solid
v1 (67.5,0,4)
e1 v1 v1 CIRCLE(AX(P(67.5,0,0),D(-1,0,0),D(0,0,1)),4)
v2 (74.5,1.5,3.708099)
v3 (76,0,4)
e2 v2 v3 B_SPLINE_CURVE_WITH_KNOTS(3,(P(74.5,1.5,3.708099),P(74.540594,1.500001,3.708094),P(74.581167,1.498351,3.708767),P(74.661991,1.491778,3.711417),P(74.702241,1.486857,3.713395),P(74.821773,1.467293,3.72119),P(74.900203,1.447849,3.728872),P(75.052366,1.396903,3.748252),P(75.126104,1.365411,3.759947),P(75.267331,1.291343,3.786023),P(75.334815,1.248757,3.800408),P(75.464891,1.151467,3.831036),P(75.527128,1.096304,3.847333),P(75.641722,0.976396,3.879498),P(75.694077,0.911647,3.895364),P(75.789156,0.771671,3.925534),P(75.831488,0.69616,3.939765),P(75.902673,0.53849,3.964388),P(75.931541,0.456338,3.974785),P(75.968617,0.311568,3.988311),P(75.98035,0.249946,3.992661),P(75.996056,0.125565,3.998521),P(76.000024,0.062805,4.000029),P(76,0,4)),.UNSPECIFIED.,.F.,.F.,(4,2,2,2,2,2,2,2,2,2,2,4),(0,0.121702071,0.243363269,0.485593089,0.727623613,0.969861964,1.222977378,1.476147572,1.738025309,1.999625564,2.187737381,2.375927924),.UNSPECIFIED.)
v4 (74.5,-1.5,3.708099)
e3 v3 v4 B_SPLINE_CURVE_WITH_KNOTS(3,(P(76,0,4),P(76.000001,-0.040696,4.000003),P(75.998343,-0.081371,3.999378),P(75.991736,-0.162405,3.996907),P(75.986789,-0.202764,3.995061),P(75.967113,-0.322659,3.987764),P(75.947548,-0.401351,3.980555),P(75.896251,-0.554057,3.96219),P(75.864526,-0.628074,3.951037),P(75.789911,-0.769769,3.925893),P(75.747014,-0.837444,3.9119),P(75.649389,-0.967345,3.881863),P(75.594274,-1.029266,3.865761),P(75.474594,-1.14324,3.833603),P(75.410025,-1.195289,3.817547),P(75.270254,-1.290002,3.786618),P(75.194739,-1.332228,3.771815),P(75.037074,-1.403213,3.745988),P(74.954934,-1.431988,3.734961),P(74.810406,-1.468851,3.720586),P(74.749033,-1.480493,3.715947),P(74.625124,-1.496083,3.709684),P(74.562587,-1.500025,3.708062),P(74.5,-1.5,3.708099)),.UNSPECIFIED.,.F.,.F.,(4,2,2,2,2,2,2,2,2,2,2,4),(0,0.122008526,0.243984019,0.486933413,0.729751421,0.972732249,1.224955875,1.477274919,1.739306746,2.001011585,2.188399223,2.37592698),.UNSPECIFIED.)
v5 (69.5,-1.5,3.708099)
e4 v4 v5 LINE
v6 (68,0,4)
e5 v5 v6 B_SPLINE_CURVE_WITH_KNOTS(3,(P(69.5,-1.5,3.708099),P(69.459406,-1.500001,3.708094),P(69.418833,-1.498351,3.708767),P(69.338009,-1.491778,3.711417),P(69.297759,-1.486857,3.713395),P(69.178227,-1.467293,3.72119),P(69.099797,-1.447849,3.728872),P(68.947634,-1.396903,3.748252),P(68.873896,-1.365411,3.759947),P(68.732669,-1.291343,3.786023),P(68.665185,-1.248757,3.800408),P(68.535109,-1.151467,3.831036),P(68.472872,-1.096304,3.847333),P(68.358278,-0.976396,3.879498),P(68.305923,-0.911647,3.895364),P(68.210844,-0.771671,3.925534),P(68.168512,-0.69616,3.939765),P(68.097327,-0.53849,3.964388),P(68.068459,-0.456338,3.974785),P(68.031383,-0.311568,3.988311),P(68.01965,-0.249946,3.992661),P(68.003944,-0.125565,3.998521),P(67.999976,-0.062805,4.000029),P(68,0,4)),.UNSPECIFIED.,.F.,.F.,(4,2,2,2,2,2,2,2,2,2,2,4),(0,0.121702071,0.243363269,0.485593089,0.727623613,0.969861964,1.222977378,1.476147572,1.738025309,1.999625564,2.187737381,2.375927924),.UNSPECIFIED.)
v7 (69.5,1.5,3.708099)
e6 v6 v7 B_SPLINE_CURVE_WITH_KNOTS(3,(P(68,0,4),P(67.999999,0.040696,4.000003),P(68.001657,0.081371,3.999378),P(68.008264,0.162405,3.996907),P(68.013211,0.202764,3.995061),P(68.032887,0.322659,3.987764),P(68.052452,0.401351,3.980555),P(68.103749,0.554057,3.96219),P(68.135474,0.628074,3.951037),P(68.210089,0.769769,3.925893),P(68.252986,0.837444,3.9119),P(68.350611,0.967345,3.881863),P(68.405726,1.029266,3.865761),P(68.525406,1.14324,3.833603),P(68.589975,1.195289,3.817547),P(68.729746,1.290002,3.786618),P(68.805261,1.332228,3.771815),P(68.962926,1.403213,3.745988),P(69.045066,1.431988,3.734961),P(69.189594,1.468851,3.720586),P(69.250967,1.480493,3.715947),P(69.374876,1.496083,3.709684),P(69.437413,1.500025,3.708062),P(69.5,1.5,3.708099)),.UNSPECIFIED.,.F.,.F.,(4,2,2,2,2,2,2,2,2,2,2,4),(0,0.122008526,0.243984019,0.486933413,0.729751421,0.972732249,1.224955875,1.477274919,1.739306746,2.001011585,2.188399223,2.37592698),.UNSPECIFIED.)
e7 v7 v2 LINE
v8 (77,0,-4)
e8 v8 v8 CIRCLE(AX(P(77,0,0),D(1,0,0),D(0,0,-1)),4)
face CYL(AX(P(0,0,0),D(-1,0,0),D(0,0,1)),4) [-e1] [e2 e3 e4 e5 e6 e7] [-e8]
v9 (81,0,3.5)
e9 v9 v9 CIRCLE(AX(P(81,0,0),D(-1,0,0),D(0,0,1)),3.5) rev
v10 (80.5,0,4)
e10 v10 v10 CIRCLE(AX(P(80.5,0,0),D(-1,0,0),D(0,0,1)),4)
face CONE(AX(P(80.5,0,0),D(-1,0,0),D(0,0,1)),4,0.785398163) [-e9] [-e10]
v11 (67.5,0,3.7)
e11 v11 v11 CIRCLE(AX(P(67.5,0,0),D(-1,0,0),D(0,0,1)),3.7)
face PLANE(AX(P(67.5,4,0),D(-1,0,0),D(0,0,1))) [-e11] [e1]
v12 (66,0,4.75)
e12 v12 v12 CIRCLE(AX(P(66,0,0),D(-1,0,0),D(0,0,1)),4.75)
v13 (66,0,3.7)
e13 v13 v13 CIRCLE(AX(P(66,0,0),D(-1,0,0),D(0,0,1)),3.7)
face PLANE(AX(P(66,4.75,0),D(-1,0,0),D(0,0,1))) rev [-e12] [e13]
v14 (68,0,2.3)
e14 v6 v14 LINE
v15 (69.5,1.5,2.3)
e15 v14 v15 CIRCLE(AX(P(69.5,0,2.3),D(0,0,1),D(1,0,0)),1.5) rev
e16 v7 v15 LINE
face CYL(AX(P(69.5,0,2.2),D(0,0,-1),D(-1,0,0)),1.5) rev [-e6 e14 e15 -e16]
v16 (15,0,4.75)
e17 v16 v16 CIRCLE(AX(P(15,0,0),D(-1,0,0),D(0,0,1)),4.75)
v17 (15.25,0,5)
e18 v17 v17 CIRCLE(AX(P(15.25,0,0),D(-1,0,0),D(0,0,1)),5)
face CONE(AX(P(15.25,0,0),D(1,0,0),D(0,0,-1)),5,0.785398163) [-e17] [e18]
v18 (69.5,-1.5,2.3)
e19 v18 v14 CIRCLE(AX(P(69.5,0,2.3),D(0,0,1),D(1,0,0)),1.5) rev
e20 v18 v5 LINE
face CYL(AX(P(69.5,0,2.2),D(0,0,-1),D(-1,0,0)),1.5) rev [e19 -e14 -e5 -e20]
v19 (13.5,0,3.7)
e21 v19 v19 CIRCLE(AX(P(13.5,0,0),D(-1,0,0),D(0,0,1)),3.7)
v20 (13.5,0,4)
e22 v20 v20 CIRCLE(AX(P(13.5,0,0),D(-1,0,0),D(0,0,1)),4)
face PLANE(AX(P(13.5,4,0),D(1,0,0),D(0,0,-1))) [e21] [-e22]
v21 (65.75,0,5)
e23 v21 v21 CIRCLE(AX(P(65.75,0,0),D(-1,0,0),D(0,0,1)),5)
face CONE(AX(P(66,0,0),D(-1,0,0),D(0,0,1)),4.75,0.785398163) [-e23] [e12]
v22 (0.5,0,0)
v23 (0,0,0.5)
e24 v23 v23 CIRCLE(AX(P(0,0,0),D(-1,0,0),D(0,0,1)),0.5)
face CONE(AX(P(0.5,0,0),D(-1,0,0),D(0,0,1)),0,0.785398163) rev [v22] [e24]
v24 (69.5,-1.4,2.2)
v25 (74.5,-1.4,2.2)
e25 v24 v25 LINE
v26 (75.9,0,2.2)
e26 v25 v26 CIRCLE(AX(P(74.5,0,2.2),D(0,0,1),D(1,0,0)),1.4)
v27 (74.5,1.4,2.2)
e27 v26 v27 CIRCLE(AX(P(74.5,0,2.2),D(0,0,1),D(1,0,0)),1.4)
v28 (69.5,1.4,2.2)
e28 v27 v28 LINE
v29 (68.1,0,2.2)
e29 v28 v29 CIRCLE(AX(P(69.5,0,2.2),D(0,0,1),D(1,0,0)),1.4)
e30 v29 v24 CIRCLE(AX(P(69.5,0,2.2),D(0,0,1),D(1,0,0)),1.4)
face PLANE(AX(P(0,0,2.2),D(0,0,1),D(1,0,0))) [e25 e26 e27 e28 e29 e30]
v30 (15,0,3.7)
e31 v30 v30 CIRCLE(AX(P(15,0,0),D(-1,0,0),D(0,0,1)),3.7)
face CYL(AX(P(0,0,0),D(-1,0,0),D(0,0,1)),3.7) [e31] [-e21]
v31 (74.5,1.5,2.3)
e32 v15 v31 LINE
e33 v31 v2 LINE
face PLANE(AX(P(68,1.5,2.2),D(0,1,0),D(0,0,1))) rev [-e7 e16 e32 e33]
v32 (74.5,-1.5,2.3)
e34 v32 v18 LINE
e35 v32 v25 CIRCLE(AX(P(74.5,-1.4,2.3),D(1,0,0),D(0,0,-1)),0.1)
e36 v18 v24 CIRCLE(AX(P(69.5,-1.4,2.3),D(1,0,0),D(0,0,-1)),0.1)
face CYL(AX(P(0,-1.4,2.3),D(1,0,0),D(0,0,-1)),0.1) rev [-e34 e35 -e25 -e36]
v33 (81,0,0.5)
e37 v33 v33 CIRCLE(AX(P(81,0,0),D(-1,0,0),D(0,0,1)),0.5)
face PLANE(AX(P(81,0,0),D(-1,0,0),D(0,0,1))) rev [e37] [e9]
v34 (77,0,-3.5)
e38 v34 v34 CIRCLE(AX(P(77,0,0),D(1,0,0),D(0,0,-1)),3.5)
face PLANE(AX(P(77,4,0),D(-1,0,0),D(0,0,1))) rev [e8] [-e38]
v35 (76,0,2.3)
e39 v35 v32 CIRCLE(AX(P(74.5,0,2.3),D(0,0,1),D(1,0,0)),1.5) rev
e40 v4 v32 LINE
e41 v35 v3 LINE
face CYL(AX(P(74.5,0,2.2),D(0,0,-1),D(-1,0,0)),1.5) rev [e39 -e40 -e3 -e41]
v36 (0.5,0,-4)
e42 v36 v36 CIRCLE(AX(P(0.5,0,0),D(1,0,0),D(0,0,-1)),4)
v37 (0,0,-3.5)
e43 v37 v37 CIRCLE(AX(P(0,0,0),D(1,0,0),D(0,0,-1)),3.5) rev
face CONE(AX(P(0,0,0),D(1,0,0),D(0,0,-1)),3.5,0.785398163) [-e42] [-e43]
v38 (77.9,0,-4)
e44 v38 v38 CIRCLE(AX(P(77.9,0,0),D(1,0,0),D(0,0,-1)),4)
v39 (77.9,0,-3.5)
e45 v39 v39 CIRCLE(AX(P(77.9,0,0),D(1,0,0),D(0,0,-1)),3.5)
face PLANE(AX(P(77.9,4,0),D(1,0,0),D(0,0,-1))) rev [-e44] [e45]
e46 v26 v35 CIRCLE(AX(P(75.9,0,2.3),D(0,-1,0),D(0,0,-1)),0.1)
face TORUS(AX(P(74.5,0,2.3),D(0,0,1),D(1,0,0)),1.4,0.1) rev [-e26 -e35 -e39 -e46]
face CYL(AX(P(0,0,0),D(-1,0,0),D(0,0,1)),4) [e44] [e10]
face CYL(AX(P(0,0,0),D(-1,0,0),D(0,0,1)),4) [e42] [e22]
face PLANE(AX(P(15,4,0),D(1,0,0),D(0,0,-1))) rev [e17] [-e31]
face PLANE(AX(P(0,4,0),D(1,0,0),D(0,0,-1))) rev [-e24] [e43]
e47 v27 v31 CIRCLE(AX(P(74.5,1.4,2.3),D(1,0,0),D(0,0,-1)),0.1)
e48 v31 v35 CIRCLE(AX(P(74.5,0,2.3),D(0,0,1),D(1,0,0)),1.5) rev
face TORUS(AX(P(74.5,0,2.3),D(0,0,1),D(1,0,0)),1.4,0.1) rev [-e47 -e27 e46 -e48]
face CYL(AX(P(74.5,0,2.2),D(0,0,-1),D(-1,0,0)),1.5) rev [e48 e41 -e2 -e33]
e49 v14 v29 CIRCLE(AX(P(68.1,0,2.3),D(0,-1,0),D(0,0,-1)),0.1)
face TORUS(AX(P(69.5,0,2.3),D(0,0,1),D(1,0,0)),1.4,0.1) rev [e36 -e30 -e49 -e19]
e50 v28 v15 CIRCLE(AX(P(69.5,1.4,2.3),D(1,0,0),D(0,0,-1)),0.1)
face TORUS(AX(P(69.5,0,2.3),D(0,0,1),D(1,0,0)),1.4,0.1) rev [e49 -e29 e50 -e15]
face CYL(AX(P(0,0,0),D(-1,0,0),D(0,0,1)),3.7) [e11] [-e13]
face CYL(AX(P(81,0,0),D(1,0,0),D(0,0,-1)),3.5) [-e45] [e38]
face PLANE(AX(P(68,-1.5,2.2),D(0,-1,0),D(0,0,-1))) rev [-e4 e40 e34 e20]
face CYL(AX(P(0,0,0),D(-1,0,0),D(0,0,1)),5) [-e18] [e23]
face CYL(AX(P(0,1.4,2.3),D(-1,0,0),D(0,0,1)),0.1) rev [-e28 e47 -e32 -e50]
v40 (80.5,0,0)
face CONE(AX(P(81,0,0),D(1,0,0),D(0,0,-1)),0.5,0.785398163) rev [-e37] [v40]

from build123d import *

# Parameters (mm, degrees)
CHAMFER1_SIZE      = 0.5
SKETCH3_W          = 1.5
SKETCH3_H          = 0.3
SKETCH17_W         = 8
SKETCH17_H         = 3
CUT_EXTRUDE4_DEPTH = 1.8
FILLET10_R         = 1.5
FILLET11_R         = 1.5
FILLET12_R         = 0.1
SKETCH29_W         = 0.9
SKETCH29_H         = 0.5


with BuildPart() as part:
    # Sketch1 → Revolve1 (revolve)
    with BuildSketch(Plane.XY, mode=Mode.PRIVATE) as revolve1_sk:
        Polygon((0, 4), (15, 4), (15, 4.75), (15.25, 5), (65.75, 5), (66, 4.75), (66, 4), (81, 4), (81, 0), (0, 0), align=None)
    revolve(revolve1_sk.sketch.rotate(Axis((0, 0, 0), (1, 0, 0)), 90), axis=Axis((0, 0, 0), (1, 0, 0)))

    # Chamfer1
    chamfer1_edges = [part.edges().sort_by_distance(p)[0] for p in [
        (81, 0, -4),
        (0, 0, -4),
    ]]
    chamfer(chamfer1_edges, length=CHAMFER1_SIZE)

    # Sketch2 → Cut-Revolve1 (revolve, cut)
    with BuildSketch(Plane.XY, mode=Mode.PRIVATE) as cut_revolve1_sk:
        Polygon((0, 0.5), (0.5, 0), (0, 0), align=None)
        Polygon((81, 0), (81, 0.5), (80.5, 0), align=None)
    revolve(cut_revolve1_sk.sketch.rotate(Axis((0, 0, 0), (1, 0, 0)), 270), axis=Axis((0, 0, 0), (1, 0, 0)), mode=Mode.SUBTRACT)

    # Sketch3 → Cut-Revolve2 (revolve, cut)
    with BuildSketch(Plane.XY, mode=Mode.PRIVATE) as cut_revolve2_sk:
        with Locations((14.25, 3.85)):
            Rectangle(SKETCH3_W, SKETCH3_H)
        with Locations((66.75, 3.85)):
            Rectangle(SKETCH3_W, SKETCH3_H)
    revolve(cut_revolve2_sk.sketch.rotate(Axis((0, 0, 0), (1, 0, 0)), 90), axis=Axis((0, 0, 0), (1, 0, 0)), mode=Mode.SUBTRACT)

    # Sketch17 → Cut-Extrude4 (cut)
    with BuildSketch(Plane.XY.offset(4)):
        with Locations((72, 0)):
            Rectangle(SKETCH17_W, SKETCH17_H)
    extrude(amount=-CUT_EXTRUDE4_DEPTH, mode=Mode.SUBTRACT)

    # Fillet10
    fillet10_edges = [part.edges().sort_by_distance(p)[0] for p in [
        (76, 1.5, 2.954049622),
        (76, -1.5, 2.954049622),
    ]]
    fillet(fillet10_edges, radius=FILLET10_R - 0.0001)  # a hair under: the kernel refuses the full size

    # Fillet11
    fillet11_edges = [part.edges().sort_by_distance(p)[0] for p in [
        (68, 1.5, 2.954049622),
        (68, -1.5, 2.954049622),
    ]]
    fillet(fillet11_edges, radius=FILLET11_R - 0.0001)  # a hair under: the kernel refuses the full size

    # Fillet12
    fillet12_edges = [part.edges().sort_by_distance(p)[0] for p in [
        (72, 1.5, 2.2),
        (75.560689461, -1.060689461, 2.2),
        (75.560689461, 1.060689461, 2.2),
        (72, -1.5, 2.2),
        (68.439310539, -1.060689461, 2.2),
        (68.439310539, 1.060689461, 2.2),
    ]]
    fillet(fillet12_edges, radius=FILLET12_R)

    # Sketch29 → Cut-Revolve6 (revolve, cut)
    with BuildSketch(Plane.XY, mode=Mode.PRIVATE) as cut_revolve6_sk:
        with Locations((77.45, 3.75)):
            Rectangle(SKETCH29_W, SKETCH29_H)
    revolve(cut_revolve6_sk.sketch.rotate(Axis((81, 0, 0), (-1, 0, 0)), 270), axis=Axis((81, 0, 0), (-1, 0, 0)), mode=Mode.SUBTRACT)


solid = part.part
